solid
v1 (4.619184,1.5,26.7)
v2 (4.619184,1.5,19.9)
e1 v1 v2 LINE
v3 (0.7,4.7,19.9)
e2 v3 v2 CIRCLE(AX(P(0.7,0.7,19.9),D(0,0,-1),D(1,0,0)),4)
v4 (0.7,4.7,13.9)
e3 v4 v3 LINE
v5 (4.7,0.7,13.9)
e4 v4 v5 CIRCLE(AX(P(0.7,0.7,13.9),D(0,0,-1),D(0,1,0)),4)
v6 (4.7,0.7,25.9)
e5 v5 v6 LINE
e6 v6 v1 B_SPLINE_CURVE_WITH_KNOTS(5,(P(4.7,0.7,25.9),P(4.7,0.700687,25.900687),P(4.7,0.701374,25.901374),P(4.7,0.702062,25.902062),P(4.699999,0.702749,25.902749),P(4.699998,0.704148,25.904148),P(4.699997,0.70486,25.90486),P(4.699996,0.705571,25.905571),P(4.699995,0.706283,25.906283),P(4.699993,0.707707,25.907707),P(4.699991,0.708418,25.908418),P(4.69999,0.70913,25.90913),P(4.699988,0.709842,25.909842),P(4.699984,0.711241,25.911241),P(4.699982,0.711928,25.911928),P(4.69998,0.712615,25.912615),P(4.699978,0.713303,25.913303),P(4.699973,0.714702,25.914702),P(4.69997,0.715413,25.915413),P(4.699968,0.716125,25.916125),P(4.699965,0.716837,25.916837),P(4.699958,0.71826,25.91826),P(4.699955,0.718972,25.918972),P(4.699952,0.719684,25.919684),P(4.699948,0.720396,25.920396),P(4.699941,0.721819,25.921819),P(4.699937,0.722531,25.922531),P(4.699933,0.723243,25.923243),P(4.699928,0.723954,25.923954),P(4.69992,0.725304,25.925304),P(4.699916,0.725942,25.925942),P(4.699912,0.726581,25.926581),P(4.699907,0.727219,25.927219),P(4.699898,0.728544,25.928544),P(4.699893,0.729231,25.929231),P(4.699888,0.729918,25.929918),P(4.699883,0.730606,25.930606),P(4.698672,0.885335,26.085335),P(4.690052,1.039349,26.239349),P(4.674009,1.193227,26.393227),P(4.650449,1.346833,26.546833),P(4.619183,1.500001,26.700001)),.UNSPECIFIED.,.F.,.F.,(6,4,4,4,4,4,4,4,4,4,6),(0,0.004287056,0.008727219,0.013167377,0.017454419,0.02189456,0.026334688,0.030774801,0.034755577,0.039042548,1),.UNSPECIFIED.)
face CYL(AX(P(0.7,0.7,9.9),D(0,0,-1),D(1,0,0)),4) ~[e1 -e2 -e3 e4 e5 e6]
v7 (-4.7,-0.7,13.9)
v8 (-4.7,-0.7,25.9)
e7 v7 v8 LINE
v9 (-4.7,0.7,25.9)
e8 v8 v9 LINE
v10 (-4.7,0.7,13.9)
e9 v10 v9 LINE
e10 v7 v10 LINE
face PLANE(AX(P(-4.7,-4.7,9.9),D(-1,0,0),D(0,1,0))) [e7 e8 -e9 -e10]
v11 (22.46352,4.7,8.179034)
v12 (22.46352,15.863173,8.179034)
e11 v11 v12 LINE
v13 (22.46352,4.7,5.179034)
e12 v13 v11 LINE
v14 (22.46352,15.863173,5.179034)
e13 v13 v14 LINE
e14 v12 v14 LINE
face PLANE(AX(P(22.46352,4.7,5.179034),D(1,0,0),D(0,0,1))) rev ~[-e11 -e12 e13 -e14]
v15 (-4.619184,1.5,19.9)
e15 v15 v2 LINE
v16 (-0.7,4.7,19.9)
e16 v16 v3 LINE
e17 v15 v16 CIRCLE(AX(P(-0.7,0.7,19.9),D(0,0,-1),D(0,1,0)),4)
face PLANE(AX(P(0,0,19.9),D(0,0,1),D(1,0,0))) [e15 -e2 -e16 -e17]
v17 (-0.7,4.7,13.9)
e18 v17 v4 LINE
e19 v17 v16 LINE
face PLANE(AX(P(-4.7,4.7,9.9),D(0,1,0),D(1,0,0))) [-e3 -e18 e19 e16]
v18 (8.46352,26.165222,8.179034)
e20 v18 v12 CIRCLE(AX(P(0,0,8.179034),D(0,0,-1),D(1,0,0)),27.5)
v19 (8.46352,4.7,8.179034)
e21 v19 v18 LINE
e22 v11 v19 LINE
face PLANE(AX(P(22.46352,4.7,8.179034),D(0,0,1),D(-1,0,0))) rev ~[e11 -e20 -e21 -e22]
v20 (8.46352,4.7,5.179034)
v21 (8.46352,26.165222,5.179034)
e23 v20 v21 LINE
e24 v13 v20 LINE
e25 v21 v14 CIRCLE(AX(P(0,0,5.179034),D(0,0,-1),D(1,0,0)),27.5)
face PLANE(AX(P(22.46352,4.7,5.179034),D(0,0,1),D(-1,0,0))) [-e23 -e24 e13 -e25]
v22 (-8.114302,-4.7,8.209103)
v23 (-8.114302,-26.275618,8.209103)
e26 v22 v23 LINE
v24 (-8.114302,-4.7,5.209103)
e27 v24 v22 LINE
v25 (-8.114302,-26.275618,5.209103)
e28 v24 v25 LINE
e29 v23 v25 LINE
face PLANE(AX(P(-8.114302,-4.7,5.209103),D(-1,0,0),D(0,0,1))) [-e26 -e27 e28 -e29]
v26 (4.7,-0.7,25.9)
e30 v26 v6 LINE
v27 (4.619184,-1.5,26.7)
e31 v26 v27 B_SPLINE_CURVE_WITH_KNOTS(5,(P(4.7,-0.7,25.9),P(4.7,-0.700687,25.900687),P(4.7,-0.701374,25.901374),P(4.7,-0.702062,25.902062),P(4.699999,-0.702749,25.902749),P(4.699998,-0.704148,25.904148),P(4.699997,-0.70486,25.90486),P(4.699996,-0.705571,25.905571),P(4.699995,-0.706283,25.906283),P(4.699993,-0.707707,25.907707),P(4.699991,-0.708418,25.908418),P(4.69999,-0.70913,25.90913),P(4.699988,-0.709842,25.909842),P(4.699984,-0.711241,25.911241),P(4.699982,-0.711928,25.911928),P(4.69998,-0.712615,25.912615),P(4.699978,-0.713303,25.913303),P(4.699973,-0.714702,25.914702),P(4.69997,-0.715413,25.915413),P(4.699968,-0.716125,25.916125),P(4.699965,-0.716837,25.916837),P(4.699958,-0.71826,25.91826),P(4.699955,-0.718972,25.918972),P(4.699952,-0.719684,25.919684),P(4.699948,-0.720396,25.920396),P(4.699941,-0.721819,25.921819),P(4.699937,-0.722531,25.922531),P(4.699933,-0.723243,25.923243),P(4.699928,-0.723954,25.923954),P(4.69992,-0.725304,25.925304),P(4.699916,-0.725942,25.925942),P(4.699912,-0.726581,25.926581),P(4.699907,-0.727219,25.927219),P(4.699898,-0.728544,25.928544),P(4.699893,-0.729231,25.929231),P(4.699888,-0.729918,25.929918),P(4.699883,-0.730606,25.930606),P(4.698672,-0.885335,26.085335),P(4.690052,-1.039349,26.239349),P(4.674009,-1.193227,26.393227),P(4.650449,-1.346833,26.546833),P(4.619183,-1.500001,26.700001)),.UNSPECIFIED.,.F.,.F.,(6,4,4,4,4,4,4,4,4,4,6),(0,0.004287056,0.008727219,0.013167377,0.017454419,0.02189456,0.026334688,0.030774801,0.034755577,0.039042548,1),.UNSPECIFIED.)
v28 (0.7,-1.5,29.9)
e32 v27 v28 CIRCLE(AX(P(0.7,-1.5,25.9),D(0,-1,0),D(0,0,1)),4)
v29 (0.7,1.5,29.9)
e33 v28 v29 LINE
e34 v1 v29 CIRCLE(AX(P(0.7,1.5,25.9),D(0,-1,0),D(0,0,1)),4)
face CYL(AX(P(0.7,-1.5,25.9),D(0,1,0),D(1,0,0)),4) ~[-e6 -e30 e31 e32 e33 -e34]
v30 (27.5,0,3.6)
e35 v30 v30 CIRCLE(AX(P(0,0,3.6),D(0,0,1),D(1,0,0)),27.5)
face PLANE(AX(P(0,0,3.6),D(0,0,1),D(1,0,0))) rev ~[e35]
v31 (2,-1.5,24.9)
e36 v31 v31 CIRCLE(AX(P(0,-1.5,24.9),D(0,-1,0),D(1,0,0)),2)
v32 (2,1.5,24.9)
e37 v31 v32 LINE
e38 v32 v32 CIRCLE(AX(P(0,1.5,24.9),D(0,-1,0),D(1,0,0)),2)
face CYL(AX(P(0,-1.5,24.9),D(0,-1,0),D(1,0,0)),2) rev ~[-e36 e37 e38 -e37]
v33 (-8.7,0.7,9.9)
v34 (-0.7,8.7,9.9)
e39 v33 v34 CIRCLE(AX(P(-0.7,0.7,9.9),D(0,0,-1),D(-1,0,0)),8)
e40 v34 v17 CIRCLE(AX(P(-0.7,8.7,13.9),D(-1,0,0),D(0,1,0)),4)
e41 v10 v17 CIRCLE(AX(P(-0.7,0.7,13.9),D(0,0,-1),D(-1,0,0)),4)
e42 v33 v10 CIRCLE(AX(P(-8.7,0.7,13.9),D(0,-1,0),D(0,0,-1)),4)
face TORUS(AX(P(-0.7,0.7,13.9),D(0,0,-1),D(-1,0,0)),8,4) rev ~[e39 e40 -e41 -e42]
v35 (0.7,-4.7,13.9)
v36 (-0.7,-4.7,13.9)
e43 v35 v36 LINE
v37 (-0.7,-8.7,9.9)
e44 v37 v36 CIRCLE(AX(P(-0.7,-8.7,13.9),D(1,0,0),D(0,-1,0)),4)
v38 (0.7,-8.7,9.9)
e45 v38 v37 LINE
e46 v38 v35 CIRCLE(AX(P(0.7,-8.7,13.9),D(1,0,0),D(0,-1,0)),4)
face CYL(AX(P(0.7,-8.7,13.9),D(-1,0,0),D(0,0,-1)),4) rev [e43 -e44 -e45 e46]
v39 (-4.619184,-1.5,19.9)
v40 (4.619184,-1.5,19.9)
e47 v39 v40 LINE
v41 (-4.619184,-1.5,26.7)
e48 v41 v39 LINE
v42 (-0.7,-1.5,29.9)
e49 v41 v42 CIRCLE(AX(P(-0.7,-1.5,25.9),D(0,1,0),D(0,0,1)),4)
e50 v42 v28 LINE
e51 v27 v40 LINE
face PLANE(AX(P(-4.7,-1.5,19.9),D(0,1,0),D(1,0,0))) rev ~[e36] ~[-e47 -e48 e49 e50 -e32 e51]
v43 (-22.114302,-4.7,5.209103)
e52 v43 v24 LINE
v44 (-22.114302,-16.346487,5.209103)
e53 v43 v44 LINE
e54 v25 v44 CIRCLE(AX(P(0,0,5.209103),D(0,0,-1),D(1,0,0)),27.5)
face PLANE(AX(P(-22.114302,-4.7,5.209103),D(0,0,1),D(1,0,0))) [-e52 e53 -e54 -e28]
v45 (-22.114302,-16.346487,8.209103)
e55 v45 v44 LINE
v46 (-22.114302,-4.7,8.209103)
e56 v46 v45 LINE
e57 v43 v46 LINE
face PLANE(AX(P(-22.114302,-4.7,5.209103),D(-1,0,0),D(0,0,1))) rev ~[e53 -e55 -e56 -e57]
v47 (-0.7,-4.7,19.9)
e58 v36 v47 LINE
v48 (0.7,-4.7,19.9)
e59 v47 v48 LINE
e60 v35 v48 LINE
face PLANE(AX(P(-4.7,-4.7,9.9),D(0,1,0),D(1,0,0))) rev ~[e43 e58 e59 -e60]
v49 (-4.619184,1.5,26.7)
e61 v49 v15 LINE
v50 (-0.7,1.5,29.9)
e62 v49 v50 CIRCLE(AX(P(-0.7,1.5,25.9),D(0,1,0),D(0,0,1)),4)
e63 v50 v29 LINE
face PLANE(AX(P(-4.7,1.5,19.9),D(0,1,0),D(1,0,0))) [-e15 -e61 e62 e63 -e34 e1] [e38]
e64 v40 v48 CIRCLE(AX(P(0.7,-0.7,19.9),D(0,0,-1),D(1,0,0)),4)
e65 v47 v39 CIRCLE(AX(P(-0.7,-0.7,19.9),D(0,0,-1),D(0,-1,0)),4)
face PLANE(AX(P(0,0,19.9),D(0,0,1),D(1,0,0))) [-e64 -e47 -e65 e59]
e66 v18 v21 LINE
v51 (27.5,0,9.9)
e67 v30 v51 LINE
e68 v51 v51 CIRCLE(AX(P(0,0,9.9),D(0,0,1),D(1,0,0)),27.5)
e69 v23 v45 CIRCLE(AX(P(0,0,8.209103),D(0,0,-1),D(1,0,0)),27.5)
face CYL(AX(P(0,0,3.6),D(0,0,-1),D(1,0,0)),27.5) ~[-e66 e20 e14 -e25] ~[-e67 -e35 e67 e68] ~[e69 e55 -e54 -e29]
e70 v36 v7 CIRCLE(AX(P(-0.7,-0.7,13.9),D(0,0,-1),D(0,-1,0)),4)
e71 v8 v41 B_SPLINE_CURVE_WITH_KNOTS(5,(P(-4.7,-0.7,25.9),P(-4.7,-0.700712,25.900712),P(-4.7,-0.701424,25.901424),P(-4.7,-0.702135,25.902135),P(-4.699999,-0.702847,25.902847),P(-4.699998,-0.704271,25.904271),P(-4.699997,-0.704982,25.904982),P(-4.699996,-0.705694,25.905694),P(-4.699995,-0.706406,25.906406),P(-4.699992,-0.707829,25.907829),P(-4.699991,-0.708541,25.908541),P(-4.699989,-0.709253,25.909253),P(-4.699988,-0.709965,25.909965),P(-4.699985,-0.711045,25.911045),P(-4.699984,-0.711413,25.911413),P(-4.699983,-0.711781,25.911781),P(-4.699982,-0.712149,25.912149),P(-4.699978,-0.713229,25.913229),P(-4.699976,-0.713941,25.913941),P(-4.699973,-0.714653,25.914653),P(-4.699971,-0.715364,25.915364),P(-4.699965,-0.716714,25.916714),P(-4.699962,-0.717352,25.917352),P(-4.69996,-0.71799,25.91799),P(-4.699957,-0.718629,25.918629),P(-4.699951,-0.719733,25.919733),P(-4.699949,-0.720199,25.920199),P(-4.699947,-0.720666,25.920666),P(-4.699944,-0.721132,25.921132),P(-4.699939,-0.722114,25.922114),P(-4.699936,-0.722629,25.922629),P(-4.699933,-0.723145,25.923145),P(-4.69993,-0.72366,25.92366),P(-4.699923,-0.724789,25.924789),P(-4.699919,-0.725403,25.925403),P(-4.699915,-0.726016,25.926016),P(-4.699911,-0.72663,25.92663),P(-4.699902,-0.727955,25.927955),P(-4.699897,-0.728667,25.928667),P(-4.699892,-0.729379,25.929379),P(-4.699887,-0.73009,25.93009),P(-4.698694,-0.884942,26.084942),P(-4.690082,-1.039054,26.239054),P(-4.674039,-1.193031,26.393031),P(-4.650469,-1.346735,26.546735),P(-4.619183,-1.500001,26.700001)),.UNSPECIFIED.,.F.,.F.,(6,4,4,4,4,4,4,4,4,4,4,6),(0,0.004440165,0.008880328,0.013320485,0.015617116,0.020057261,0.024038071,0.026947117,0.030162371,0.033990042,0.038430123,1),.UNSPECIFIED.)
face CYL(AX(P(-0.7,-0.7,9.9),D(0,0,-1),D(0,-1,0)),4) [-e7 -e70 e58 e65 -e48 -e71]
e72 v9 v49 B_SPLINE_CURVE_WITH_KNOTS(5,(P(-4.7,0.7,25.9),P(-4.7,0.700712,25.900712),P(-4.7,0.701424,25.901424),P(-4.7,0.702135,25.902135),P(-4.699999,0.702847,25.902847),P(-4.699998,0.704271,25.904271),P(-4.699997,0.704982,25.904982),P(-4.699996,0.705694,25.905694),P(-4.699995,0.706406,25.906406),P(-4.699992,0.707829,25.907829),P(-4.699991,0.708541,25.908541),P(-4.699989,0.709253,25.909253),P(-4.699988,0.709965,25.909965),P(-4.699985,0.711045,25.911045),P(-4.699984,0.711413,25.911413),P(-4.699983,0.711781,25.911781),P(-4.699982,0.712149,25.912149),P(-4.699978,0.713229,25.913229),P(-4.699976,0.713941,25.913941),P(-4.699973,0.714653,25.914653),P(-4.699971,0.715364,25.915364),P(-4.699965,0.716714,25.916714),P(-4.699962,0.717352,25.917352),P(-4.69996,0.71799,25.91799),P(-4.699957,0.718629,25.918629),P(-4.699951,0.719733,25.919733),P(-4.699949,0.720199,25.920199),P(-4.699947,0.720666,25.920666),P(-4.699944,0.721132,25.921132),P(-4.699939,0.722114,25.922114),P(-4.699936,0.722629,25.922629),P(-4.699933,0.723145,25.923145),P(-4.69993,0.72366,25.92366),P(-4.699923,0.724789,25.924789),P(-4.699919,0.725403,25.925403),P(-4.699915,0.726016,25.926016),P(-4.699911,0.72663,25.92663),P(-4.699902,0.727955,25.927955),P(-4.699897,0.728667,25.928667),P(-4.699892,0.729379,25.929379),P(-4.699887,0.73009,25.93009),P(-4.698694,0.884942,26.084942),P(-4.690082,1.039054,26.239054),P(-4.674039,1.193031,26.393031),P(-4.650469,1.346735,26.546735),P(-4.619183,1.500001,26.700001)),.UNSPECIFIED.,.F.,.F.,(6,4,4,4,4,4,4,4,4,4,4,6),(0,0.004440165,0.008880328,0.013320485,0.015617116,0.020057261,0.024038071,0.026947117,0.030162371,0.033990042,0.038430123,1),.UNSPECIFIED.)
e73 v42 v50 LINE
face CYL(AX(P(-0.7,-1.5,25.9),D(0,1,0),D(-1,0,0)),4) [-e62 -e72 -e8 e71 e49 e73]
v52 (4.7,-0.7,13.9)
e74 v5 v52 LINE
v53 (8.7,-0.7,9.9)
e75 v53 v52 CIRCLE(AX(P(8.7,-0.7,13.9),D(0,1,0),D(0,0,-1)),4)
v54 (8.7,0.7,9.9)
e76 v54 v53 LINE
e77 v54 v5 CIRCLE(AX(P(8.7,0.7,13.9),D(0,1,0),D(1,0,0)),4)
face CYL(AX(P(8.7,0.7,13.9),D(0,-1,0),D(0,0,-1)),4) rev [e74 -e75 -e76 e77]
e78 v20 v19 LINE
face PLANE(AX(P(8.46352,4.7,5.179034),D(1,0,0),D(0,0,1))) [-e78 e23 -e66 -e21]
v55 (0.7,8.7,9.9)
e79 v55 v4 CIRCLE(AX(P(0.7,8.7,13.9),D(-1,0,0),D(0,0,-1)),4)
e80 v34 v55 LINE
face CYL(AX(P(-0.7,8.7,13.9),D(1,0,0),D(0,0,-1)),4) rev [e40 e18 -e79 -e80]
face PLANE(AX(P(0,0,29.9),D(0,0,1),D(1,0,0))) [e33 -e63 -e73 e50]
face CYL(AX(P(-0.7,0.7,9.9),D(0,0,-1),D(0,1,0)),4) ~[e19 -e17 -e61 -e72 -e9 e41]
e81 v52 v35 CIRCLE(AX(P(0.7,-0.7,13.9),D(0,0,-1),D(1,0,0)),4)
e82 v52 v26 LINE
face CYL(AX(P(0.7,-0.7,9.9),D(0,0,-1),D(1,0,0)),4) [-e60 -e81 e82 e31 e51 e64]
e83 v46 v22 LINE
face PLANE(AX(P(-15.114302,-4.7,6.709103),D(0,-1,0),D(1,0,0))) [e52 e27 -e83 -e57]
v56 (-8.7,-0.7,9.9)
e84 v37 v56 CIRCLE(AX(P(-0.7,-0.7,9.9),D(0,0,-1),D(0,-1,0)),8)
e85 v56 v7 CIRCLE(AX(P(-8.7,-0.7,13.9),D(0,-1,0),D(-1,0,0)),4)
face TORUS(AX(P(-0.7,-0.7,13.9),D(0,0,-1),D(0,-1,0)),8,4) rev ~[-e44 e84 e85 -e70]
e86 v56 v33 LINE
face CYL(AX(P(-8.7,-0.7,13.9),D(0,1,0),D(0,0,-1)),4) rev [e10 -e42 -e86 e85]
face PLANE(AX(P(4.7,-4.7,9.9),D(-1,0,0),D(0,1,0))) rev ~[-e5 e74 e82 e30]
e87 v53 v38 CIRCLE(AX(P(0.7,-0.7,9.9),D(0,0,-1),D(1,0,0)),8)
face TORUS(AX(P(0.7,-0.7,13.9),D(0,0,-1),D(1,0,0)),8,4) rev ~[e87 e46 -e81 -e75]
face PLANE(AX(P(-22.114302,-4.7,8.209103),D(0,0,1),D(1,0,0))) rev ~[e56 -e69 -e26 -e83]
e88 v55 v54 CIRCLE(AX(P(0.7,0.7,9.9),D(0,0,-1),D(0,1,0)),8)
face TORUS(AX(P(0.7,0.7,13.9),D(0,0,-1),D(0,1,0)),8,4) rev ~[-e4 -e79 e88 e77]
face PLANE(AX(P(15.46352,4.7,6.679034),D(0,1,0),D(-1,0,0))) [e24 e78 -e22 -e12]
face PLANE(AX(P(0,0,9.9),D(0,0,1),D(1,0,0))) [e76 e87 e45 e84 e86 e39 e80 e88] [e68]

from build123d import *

# Parameters (mm, degrees)
F1_R         = 27.5
F2_DEPTH     = 6.3
F3_W         = 9.4
F3_H         = 9.4
F4_DEPTH     = 10
F5_W         = 9.4
F5_H         = 3
F6_DEPTH     = 10
F7_R         = 2
F8_DEPTH     = 25
F9_R         = 4
F10_T1_DEPTH = 20
F11_R        = 4
F12_W        = 14
F12_H        = 3
F13_DEPTH    = 25
F14_W        = 14
F14_H        = 3
F15_DEPTH    = 25


# Not quite as in the source:
# - a fillet or chamfer that OpenCascade refuses, or shapes differently, is made with other operations: its cross-section is extruded or revolved along the edge and cut away or added


with BuildPart() as f2:
    # F1 (on offset) → F2 (new body)
    with BuildSketch(Plane.XY.offset(3.6)):
        Circle(F1_R)
    extrude(amount=F2_DEPTH)

    # F3 (on face) → F4 (join)
    with BuildSketch(Plane.XY.offset(9.9)):
        Rectangle(F3_W, F3_H)
    extrude(amount=F4_DEPTH)

    # F5 (on face) → F6 (join)
    with BuildSketch(Plane.XY.offset(19.9)):
        Rectangle(F5_W, F5_H)
    extrude(amount=F6_DEPTH)

    # F7 (on face) → F8 (cut)
    with BuildSketch(Plane.XZ.offset(1.5)):
        with Locations((0, 24.9)):
            Circle(F7_R)
    extrude(amount=-F8_DEPTH, mode=Mode.SUBTRACT)

    # F9
    f9_edges = [f2.edges().sort_by_distance(p)[0] for p in [
        (-4.7, 0, 29.9),
        (4.7, 0, 29.9),
    ]]
    fillet(f9_edges, radius=F9_R)

    # F10: fillet of radius 4 on 4 edges, made by hand

    # F10_s2 → F10_t1 (cut)
    with BuildSketch(Plane.XY.offset(9.9)):
        with BuildLine():
            ThreePointArc((-0.7, -4.7), (-3.5284271247, -3.5284271247), (-4.7, -0.7))
            Line((-4.7, -0.7), (-4.7, -4.7))
            Line((-4.7, -4.7), (-0.7, -4.7))
        make_face()
        with BuildLine():
            ThreePointArc((-0.7, 4.7), (-3.5284271247, 3.5284271247), (-4.7, 0.7))
            Line((-4.7, 0.7), (-4.7, 4.7))
            Line((-4.7, 4.7), (-0.7, 4.7))
        make_face()
        with BuildLine():
            ThreePointArc((4.7, -0.7), (3.5284271247, -3.5284271247), (0.7, -4.7))
            Line((0.7, -4.7), (4.7, -4.7))
            Line((4.7, -4.7), (4.7, -0.7))
        make_face()
        with BuildLine():
            ThreePointArc((4.7, 0.7), (3.5284271247, 3.5284271247), (0.7, 4.7))
            Line((0.7, 4.7), (4.7, 4.7))
            Line((4.7, 4.7), (4.7, 0.7))
        make_face()
    extrude(amount=F10_T1_DEPTH, mode=Mode.SUBTRACT)

    # F11
    f11_edges = [f2.edges().sort_by_distance(p)[0] for p in [
        (-3.528427, -3.528427, 9.9),
    ]]
    fillet(f11_edges, radius=F11_R)

    # F12 (on face) → F13 (cut)
    with BuildSketch(Plane(origin=(0, 4.7, 0), x_dir=(-1, 0, 0), z_dir=(0, 1, 0))):
        with Locations((-15.4635200504, 6.6790340934)):
            Rectangle(F12_W, F12_H)
    extrude(amount=F13_DEPTH, mode=Mode.SUBTRACT)

    # F14 (on face) → F15 (cut)
    with BuildSketch(Plane.XZ.offset(4.7)):
        with Locations((-15.1143019667, 6.7091025412)):
            Rectangle(F14_W, F14_H)
    extrude(amount=F15_DEPTH, mode=Mode.SUBTRACT)


solid = f2.part
